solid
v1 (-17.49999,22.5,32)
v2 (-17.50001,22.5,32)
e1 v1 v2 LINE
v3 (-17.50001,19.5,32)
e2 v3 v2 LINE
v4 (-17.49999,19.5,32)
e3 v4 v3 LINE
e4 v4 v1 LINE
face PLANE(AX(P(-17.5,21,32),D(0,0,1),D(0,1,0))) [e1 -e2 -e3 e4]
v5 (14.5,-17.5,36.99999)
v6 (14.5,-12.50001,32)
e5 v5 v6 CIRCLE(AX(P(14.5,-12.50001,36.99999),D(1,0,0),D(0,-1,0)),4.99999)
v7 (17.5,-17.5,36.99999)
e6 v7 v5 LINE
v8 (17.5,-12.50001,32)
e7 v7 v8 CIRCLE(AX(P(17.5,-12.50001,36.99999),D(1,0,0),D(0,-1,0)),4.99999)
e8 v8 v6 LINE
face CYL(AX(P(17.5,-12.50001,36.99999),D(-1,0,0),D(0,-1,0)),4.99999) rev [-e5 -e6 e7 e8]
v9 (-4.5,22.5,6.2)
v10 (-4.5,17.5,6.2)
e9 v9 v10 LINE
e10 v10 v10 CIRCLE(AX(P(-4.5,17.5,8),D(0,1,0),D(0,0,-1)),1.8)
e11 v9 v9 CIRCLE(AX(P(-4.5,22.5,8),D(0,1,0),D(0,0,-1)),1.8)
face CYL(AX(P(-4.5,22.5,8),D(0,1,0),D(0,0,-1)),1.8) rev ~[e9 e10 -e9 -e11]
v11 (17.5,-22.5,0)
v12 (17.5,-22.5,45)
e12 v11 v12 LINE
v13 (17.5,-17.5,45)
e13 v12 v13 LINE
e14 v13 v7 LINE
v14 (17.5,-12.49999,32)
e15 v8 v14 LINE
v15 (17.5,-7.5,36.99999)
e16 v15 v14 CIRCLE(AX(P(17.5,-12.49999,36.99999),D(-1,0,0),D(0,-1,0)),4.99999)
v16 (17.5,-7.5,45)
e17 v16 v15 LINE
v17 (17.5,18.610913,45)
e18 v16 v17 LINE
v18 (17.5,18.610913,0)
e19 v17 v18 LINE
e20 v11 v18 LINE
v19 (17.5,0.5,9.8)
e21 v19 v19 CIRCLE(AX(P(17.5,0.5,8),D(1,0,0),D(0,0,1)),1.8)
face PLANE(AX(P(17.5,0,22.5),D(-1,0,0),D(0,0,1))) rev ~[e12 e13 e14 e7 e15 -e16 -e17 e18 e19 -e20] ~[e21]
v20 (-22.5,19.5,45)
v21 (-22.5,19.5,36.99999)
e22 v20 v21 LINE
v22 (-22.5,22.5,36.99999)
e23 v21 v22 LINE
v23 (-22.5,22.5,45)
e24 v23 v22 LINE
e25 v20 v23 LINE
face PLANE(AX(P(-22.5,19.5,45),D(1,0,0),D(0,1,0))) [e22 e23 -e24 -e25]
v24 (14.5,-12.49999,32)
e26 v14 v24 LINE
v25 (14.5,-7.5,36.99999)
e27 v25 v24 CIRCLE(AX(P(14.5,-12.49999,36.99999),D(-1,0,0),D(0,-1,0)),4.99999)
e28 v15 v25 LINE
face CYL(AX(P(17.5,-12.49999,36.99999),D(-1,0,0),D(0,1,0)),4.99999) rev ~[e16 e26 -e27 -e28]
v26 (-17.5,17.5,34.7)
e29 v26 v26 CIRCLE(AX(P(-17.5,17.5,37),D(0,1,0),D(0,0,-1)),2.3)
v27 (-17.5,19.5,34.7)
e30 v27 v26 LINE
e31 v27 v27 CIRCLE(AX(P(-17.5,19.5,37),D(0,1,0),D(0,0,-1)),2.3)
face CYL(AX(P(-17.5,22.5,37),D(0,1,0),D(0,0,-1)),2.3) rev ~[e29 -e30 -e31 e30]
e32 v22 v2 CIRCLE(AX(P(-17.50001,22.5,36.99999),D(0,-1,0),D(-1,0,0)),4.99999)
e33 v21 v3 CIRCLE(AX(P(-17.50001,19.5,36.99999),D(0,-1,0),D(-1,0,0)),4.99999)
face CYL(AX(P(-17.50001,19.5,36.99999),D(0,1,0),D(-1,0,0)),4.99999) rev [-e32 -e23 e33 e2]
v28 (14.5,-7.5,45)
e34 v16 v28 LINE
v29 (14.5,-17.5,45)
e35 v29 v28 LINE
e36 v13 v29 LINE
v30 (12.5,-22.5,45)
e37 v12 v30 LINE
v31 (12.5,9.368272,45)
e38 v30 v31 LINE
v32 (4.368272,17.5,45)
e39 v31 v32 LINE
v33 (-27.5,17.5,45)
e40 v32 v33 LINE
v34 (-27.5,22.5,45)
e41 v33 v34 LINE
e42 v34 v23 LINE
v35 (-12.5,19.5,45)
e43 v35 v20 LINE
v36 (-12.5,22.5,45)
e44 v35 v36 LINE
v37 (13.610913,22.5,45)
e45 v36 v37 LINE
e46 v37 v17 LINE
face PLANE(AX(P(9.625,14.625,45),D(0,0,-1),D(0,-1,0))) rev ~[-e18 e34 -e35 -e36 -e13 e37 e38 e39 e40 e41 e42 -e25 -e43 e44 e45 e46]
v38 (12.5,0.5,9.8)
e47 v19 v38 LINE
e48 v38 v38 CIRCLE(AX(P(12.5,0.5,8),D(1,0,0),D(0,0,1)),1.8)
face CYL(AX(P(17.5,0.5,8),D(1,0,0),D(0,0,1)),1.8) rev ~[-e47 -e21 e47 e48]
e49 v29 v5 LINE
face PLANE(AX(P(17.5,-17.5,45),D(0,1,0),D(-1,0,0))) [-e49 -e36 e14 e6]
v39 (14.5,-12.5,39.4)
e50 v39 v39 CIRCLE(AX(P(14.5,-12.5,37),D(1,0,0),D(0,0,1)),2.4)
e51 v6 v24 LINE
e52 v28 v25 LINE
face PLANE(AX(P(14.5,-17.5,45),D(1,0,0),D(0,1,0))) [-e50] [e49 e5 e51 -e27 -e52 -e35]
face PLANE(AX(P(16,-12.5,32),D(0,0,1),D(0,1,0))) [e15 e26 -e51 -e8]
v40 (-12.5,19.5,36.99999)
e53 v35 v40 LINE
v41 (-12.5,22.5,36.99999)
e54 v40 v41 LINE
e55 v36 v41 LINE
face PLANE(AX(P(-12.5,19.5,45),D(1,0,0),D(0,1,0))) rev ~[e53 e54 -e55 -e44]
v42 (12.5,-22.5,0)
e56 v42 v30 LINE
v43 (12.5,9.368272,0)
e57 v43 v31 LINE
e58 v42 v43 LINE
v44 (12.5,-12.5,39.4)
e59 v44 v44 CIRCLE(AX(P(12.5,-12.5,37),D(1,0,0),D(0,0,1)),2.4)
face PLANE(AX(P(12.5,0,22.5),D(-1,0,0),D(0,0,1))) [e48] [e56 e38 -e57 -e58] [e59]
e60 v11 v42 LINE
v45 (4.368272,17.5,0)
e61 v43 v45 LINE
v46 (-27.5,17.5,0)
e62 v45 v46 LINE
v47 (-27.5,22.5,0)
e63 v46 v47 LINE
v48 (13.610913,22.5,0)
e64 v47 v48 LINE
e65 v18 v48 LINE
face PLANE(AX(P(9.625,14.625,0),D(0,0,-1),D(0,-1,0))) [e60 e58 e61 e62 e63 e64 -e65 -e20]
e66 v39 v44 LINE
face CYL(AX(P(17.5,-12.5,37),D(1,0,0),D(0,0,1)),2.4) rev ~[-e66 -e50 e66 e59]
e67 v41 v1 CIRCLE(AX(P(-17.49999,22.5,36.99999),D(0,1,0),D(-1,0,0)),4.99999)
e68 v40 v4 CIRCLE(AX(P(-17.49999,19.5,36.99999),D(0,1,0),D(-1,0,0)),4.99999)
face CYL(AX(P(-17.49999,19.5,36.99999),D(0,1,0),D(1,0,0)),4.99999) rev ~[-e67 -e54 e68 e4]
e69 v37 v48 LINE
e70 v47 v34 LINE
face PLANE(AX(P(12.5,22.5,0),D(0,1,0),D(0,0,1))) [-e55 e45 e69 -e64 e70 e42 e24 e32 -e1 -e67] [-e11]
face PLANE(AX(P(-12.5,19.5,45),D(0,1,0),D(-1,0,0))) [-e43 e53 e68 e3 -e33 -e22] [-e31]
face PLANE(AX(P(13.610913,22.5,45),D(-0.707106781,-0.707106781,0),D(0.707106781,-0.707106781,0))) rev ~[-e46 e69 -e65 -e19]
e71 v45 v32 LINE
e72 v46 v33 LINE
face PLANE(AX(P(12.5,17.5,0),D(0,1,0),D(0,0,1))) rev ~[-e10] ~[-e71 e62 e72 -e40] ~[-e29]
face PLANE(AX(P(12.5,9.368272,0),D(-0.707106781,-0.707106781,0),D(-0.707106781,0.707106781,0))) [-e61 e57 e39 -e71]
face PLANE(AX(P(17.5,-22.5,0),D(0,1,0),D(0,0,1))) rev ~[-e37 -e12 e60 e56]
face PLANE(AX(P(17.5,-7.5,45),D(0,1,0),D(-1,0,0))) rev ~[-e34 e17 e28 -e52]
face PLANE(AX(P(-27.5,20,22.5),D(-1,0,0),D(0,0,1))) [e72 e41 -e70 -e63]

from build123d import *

# Parameters (mm, degrees)
F0_W      = 45
F0_H      = 45
F1_DEPTH  = 5
F2_W      = 45
F2_H      = 5
F3_DEPTH  = 40
F5_DEPTH  = 45
F7_DEPTH  = 45.001
F9_R      = 1.8
F9_R_2    = 2.3
F10_DEPTH = 45.001
F11_R     = 2.4
F11_R_2   = 1.8
F12_DEPTH = 45.001
F13_W     = 10
F13_H     = 3
F13_W_2   = 3
F13_H_2   = 10
F14_DEPTH = 13
F15_R     = 4.99999
F16_ANGLE = -90


# Not quite as in the source:
# - a fillet or chamfer is up to 0.001 mm smaller than in the source, because OpenCascade refuses the exact size


with BuildPart() as f1:
    # F0 (on Top) → F1 (new body)
    with BuildSketch(Plane.XY):
        Rectangle(F0_W, F0_H)
    extrude(amount=F1_DEPTH)

    # F2 (on face) → F3 (join)
    with BuildSketch(Plane.XY.offset(5)):
        with Locations((0, 20)):
            Rectangle(F2_W, F2_H)
    extrude(amount=F3_DEPTH)

    # F4 (on face) → F5 (join, through all)
    with BuildSketch(Plane(origin=(-22.5, 0, 0), x_dir=(0, -1, 0), z_dir=(-1, 0, 0))):
        Polygon((-9.3682720164, 5), (-17.5, 13.1317279836), (-17.5, 5), align=None)
    extrude(amount=-F5_DEPTH)

    # F6 (on face) → F7 (cut, through all)
    with BuildSketch(Plane.YZ.offset(22.5)):
        Polygon((18.6109127035, 0), (22.5, 0), (22.5, 3.8890872965), align=None)
    extrude(amount=-F7_DEPTH, mode=Mode.SUBTRACT)

    # F9 (on face) → F10 (cut, through all)
    with BuildSketch(Plane(origin=(0, 22.5, 0), x_dir=(-1, 0, 0), z_dir=(0, 1, 0))):
        with Locations((14.5, 22)):
            Circle(F9_R)
        with Locations((-14.5, 35)):
            Circle(F9_R_2)
    extrude(amount=-F10_DEPTH, mode=Mode.SUBTRACT)

    # F11 (on face) → F12 (cut, through all)
    with BuildSketch(Plane(origin=(0, 0, 0), x_dir=(1, 0, 0), z_dir=(0, 0, -1))):
        with Locations((14.5, 12.5)):
            Circle(F11_R)
        with Locations((-14.5, -0.5)):
            Circle(F11_R_2)
    extrude(amount=-F12_DEPTH, mode=Mode.SUBTRACT)

    # F13 (on face) → F14 (cut)
    with BuildSketch(Plane.YZ.offset(22.5)):
        with Locations((-12.5, 1.5)):
            Rectangle(F13_W, F13_H)
        with Locations((21, 35)):
            Rectangle(F13_W_2, F13_H_2)
    extrude(amount=-F14_DEPTH, mode=Mode.SUBTRACT)

    # F15 (radius 5 in the source; OpenCascade refuses exactly that, so slightly less here)
    f15_edges = [f1.edges().sort_by_distance(p)[0] for p in [
        (9.5, -17.5, 1.5),
        (9.5, -7.5, 1.5),
        (9.5, 21, 30),
        (9.5, 21, 40),
    ]]
    fillet(f15_edges, radius=F15_R)


with BuildPart() as f1_1:
    # F16: moved
    add(f1.part.rotate(Axis((-22.5, -1.9445436483, 0), (0, 1, 0)), F16_ANGLE))


with BuildPart() as f1_2:
    # F17: moved
    add(f1_1.part.moved(Location((40, 0, 0))))


solid = f1_2.part
